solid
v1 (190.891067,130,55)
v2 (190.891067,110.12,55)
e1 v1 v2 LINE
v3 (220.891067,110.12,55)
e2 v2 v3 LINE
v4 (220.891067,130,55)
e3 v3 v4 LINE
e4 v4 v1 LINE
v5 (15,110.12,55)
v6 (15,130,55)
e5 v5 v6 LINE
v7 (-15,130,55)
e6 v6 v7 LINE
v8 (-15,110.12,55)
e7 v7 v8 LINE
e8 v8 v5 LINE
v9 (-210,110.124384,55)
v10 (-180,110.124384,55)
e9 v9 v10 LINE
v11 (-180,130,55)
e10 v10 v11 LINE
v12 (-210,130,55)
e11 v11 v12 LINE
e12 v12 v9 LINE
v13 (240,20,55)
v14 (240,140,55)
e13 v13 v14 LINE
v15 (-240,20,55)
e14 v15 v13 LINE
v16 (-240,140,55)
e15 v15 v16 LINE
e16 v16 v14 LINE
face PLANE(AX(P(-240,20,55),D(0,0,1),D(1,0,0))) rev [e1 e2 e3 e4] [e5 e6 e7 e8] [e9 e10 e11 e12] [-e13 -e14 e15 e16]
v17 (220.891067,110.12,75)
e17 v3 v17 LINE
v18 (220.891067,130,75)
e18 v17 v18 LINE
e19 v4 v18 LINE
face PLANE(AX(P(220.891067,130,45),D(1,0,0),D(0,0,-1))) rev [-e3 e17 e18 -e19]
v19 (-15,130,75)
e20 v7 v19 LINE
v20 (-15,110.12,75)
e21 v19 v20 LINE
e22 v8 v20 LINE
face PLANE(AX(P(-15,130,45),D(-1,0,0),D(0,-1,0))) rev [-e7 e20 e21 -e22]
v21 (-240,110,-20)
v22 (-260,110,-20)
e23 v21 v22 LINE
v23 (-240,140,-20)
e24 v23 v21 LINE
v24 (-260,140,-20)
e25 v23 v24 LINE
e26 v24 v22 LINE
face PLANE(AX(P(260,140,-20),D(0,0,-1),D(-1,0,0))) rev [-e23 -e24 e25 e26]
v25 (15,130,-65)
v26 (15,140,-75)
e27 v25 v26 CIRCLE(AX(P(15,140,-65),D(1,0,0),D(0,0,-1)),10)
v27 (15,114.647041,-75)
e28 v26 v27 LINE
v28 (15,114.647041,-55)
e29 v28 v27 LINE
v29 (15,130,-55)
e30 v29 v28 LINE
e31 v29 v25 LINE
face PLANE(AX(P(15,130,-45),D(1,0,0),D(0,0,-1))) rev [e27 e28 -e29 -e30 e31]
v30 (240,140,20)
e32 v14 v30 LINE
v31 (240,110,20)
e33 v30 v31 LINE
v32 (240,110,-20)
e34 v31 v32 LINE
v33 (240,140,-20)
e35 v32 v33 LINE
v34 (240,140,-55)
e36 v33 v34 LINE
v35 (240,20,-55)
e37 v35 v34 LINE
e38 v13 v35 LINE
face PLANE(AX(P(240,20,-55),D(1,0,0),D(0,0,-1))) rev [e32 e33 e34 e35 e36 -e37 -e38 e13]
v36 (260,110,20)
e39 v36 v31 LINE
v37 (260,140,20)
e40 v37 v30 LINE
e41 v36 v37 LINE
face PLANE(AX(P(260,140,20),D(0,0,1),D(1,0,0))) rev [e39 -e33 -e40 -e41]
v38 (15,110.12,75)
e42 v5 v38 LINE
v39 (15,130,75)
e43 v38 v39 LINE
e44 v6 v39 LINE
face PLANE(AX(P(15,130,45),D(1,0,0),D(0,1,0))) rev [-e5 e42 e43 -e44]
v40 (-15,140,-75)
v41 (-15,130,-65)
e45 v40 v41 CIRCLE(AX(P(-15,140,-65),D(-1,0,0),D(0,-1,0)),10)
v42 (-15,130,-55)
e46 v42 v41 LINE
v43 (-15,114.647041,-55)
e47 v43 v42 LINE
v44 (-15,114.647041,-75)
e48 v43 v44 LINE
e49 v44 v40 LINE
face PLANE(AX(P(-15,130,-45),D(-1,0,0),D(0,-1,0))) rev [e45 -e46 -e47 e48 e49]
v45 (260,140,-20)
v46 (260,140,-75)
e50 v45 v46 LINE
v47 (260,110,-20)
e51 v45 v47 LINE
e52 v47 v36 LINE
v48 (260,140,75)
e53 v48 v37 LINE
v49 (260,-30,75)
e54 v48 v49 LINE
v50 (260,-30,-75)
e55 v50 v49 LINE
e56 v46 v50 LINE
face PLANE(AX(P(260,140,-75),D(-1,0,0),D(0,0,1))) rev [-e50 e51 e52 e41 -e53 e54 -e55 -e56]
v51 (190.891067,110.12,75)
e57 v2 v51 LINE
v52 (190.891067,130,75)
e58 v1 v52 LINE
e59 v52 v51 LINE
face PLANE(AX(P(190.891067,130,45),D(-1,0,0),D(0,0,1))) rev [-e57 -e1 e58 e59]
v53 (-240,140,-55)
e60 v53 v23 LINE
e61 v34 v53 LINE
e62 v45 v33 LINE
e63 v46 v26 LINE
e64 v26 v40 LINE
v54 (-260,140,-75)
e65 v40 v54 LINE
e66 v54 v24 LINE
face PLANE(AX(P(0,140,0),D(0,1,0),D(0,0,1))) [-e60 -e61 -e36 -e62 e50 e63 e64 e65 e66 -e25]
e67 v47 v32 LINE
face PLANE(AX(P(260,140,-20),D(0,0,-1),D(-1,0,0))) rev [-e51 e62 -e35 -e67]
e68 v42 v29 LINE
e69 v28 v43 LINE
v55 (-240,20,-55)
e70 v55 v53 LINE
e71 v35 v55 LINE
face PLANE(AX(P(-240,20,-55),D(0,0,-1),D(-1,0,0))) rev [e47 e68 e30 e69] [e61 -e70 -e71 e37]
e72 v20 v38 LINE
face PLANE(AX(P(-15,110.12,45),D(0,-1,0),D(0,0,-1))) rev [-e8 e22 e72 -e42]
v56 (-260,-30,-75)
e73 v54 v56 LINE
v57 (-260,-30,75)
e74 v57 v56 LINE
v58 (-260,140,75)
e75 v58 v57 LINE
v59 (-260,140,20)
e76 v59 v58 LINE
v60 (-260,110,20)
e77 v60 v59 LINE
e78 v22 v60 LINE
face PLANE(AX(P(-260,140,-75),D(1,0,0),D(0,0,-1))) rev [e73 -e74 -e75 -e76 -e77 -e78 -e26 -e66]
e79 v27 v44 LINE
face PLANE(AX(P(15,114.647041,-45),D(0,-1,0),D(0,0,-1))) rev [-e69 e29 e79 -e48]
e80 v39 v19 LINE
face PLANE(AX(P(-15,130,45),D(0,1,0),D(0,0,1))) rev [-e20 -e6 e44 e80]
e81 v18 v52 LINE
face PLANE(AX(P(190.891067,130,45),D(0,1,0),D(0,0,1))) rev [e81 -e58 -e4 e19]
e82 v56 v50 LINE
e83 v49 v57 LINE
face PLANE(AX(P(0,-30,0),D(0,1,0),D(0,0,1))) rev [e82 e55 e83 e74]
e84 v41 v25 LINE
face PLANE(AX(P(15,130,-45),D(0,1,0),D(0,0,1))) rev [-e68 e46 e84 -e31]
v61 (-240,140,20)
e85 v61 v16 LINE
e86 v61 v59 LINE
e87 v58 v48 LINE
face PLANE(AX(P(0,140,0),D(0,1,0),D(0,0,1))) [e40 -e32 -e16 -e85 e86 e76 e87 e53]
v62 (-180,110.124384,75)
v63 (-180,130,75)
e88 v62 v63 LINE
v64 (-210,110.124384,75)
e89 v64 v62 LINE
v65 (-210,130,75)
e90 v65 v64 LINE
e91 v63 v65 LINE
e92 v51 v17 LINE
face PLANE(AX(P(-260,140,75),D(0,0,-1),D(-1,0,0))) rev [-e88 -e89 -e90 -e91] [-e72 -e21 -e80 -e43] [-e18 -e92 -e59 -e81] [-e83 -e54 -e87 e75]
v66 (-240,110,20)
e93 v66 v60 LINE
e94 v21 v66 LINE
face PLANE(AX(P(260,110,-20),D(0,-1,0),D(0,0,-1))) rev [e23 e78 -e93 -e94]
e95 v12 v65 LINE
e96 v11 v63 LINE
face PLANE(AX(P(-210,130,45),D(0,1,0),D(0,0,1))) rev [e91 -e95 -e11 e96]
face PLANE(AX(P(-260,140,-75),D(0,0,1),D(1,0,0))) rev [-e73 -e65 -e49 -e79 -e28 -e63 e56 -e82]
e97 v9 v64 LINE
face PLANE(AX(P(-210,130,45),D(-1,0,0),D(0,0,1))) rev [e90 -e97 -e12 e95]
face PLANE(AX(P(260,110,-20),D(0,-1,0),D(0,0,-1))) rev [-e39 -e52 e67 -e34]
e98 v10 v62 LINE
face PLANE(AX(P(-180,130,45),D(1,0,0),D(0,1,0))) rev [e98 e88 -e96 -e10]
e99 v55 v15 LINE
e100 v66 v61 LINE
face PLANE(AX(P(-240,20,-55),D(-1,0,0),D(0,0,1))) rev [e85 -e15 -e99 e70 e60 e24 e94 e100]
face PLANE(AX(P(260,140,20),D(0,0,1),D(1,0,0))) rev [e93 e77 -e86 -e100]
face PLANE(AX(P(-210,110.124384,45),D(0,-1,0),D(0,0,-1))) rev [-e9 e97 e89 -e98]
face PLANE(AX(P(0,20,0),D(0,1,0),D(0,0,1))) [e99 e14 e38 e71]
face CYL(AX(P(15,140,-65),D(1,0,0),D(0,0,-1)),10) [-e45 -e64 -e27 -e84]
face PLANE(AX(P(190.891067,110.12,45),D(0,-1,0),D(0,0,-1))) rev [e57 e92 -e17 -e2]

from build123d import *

# Parameters (mm, degrees)
SKETCH_1_W           = 520
SKETCH_1_H           = 150
EXTRUDE_1_DEPTH      = 140
SKETCH_2_W           = 480
SKETCH_2_H           = 110
CUT_EXTRUDE_1_DEPTH  = 120
SKETCH_11_W          = 40
SKETCH_11_H          = 30
CUT_EXTRUDE_3_DEPTH  = 544.714079273
SKETCH_13_W          = 520
SKETCH_13_H          = 150
EXTRUDE_6_DEPTH      = 30
SKETCH_18_W          = 30
SKETCH_18_H          = 15.352958973
CUT_EXTRUDE_8_DEPTH  = 30
FILLET_1_R           = 10
SKETCH_21_W          = 30
SKETCH_21_H          = 19.875616275
CUT_EXTRUDE_9_DEPTH  = 30
SKETCH_22_W          = 30
SKETCH_22_H          = 19.88
CUT_EXTRUDE_10_DEPTH = 30
SKETCH_25_W          = 30
SKETCH_25_H          = 19.88
CUT_EXTRUDE_12_DEPTH = 30


with BuildPart() as part:
    # 草圖1 → 填料-伸長1 (new body)
    with BuildSketch(Plane(origin=(0, 0, 0), x_dir=(1, 0, 0), z_dir=(0, 1, 0))):
        Rectangle(SKETCH_1_W, SKETCH_1_H)
    extrude(amount=EXTRUDE_1_DEPTH)

    # 草圖2 → 除料-伸長1 (cut)
    with BuildSketch(Plane(origin=(0, 140, 0), x_dir=(1, 0, 0), z_dir=(0, 1, 0))):
        Rectangle(SKETCH_2_W, SKETCH_2_H)
    extrude(amount=-CUT_EXTRUDE_1_DEPTH, mode=Mode.SUBTRACT)

    # 草圖11 → 除料-伸長3 (cut, through all)
    with BuildSketch(Plane.ZY.offset(260)):
        with Locations((0, 125)):
            Rectangle(SKETCH_11_W, SKETCH_11_H)
    extrude(amount=-CUT_EXTRUDE_3_DEPTH, mode=Mode.SUBTRACT)

    # 草圖13 → 填料-伸長6 (add)
    with BuildSketch(Plane.XZ):
        Rectangle(SKETCH_13_W, SKETCH_13_H)
    extrude(amount=EXTRUDE_6_DEPTH)

    # 草圖18 → 除料-伸長8 (cut)
    with BuildSketch(Plane(origin=(0, 0, -75), x_dir=(-1, 0, 0), z_dir=(0, 0, -1))):
        with Locations((0, 122.323520514)):
            Rectangle(SKETCH_18_W, SKETCH_18_H)
    extrude(amount=-CUT_EXTRUDE_8_DEPTH, mode=Mode.SUBTRACT)

    # 圓角1
    fillet_1_edges = [part.edges().sort_by_distance(p)[0] for p in [
        (0, 130, -75),
    ]]
    fillet(fillet_1_edges, radius=FILLET_1_R - 0.0001)  # a hair under: the kernel refuses the full size

    # 草圖21 → 除料-伸長9 (cut)
    with BuildSketch(Plane.XY.offset(75)):
        with Locations((-195, 120.062191863)):
            Rectangle(SKETCH_21_W, SKETCH_21_H)
    extrude(amount=-CUT_EXTRUDE_9_DEPTH, mode=Mode.SUBTRACT)

    # 草圖22 → 除料-伸長10 (cut)
    with BuildSketch(Plane.XY.offset(75)):
        with Locations((0, 120.06)):
            Rectangle(SKETCH_22_W, SKETCH_22_H)
    extrude(amount=-CUT_EXTRUDE_10_DEPTH, mode=Mode.SUBTRACT)

    # 草圖25 → 除料-伸長12 (cut)
    with BuildSketch(Plane.XY.offset(75)):
        with Locations((205.891066665, 120.06)):
            Rectangle(SKETCH_25_W, SKETCH_25_H)
    extrude(amount=-CUT_EXTRUDE_12_DEPTH, mode=Mode.SUBTRACT)


solid = part.part
